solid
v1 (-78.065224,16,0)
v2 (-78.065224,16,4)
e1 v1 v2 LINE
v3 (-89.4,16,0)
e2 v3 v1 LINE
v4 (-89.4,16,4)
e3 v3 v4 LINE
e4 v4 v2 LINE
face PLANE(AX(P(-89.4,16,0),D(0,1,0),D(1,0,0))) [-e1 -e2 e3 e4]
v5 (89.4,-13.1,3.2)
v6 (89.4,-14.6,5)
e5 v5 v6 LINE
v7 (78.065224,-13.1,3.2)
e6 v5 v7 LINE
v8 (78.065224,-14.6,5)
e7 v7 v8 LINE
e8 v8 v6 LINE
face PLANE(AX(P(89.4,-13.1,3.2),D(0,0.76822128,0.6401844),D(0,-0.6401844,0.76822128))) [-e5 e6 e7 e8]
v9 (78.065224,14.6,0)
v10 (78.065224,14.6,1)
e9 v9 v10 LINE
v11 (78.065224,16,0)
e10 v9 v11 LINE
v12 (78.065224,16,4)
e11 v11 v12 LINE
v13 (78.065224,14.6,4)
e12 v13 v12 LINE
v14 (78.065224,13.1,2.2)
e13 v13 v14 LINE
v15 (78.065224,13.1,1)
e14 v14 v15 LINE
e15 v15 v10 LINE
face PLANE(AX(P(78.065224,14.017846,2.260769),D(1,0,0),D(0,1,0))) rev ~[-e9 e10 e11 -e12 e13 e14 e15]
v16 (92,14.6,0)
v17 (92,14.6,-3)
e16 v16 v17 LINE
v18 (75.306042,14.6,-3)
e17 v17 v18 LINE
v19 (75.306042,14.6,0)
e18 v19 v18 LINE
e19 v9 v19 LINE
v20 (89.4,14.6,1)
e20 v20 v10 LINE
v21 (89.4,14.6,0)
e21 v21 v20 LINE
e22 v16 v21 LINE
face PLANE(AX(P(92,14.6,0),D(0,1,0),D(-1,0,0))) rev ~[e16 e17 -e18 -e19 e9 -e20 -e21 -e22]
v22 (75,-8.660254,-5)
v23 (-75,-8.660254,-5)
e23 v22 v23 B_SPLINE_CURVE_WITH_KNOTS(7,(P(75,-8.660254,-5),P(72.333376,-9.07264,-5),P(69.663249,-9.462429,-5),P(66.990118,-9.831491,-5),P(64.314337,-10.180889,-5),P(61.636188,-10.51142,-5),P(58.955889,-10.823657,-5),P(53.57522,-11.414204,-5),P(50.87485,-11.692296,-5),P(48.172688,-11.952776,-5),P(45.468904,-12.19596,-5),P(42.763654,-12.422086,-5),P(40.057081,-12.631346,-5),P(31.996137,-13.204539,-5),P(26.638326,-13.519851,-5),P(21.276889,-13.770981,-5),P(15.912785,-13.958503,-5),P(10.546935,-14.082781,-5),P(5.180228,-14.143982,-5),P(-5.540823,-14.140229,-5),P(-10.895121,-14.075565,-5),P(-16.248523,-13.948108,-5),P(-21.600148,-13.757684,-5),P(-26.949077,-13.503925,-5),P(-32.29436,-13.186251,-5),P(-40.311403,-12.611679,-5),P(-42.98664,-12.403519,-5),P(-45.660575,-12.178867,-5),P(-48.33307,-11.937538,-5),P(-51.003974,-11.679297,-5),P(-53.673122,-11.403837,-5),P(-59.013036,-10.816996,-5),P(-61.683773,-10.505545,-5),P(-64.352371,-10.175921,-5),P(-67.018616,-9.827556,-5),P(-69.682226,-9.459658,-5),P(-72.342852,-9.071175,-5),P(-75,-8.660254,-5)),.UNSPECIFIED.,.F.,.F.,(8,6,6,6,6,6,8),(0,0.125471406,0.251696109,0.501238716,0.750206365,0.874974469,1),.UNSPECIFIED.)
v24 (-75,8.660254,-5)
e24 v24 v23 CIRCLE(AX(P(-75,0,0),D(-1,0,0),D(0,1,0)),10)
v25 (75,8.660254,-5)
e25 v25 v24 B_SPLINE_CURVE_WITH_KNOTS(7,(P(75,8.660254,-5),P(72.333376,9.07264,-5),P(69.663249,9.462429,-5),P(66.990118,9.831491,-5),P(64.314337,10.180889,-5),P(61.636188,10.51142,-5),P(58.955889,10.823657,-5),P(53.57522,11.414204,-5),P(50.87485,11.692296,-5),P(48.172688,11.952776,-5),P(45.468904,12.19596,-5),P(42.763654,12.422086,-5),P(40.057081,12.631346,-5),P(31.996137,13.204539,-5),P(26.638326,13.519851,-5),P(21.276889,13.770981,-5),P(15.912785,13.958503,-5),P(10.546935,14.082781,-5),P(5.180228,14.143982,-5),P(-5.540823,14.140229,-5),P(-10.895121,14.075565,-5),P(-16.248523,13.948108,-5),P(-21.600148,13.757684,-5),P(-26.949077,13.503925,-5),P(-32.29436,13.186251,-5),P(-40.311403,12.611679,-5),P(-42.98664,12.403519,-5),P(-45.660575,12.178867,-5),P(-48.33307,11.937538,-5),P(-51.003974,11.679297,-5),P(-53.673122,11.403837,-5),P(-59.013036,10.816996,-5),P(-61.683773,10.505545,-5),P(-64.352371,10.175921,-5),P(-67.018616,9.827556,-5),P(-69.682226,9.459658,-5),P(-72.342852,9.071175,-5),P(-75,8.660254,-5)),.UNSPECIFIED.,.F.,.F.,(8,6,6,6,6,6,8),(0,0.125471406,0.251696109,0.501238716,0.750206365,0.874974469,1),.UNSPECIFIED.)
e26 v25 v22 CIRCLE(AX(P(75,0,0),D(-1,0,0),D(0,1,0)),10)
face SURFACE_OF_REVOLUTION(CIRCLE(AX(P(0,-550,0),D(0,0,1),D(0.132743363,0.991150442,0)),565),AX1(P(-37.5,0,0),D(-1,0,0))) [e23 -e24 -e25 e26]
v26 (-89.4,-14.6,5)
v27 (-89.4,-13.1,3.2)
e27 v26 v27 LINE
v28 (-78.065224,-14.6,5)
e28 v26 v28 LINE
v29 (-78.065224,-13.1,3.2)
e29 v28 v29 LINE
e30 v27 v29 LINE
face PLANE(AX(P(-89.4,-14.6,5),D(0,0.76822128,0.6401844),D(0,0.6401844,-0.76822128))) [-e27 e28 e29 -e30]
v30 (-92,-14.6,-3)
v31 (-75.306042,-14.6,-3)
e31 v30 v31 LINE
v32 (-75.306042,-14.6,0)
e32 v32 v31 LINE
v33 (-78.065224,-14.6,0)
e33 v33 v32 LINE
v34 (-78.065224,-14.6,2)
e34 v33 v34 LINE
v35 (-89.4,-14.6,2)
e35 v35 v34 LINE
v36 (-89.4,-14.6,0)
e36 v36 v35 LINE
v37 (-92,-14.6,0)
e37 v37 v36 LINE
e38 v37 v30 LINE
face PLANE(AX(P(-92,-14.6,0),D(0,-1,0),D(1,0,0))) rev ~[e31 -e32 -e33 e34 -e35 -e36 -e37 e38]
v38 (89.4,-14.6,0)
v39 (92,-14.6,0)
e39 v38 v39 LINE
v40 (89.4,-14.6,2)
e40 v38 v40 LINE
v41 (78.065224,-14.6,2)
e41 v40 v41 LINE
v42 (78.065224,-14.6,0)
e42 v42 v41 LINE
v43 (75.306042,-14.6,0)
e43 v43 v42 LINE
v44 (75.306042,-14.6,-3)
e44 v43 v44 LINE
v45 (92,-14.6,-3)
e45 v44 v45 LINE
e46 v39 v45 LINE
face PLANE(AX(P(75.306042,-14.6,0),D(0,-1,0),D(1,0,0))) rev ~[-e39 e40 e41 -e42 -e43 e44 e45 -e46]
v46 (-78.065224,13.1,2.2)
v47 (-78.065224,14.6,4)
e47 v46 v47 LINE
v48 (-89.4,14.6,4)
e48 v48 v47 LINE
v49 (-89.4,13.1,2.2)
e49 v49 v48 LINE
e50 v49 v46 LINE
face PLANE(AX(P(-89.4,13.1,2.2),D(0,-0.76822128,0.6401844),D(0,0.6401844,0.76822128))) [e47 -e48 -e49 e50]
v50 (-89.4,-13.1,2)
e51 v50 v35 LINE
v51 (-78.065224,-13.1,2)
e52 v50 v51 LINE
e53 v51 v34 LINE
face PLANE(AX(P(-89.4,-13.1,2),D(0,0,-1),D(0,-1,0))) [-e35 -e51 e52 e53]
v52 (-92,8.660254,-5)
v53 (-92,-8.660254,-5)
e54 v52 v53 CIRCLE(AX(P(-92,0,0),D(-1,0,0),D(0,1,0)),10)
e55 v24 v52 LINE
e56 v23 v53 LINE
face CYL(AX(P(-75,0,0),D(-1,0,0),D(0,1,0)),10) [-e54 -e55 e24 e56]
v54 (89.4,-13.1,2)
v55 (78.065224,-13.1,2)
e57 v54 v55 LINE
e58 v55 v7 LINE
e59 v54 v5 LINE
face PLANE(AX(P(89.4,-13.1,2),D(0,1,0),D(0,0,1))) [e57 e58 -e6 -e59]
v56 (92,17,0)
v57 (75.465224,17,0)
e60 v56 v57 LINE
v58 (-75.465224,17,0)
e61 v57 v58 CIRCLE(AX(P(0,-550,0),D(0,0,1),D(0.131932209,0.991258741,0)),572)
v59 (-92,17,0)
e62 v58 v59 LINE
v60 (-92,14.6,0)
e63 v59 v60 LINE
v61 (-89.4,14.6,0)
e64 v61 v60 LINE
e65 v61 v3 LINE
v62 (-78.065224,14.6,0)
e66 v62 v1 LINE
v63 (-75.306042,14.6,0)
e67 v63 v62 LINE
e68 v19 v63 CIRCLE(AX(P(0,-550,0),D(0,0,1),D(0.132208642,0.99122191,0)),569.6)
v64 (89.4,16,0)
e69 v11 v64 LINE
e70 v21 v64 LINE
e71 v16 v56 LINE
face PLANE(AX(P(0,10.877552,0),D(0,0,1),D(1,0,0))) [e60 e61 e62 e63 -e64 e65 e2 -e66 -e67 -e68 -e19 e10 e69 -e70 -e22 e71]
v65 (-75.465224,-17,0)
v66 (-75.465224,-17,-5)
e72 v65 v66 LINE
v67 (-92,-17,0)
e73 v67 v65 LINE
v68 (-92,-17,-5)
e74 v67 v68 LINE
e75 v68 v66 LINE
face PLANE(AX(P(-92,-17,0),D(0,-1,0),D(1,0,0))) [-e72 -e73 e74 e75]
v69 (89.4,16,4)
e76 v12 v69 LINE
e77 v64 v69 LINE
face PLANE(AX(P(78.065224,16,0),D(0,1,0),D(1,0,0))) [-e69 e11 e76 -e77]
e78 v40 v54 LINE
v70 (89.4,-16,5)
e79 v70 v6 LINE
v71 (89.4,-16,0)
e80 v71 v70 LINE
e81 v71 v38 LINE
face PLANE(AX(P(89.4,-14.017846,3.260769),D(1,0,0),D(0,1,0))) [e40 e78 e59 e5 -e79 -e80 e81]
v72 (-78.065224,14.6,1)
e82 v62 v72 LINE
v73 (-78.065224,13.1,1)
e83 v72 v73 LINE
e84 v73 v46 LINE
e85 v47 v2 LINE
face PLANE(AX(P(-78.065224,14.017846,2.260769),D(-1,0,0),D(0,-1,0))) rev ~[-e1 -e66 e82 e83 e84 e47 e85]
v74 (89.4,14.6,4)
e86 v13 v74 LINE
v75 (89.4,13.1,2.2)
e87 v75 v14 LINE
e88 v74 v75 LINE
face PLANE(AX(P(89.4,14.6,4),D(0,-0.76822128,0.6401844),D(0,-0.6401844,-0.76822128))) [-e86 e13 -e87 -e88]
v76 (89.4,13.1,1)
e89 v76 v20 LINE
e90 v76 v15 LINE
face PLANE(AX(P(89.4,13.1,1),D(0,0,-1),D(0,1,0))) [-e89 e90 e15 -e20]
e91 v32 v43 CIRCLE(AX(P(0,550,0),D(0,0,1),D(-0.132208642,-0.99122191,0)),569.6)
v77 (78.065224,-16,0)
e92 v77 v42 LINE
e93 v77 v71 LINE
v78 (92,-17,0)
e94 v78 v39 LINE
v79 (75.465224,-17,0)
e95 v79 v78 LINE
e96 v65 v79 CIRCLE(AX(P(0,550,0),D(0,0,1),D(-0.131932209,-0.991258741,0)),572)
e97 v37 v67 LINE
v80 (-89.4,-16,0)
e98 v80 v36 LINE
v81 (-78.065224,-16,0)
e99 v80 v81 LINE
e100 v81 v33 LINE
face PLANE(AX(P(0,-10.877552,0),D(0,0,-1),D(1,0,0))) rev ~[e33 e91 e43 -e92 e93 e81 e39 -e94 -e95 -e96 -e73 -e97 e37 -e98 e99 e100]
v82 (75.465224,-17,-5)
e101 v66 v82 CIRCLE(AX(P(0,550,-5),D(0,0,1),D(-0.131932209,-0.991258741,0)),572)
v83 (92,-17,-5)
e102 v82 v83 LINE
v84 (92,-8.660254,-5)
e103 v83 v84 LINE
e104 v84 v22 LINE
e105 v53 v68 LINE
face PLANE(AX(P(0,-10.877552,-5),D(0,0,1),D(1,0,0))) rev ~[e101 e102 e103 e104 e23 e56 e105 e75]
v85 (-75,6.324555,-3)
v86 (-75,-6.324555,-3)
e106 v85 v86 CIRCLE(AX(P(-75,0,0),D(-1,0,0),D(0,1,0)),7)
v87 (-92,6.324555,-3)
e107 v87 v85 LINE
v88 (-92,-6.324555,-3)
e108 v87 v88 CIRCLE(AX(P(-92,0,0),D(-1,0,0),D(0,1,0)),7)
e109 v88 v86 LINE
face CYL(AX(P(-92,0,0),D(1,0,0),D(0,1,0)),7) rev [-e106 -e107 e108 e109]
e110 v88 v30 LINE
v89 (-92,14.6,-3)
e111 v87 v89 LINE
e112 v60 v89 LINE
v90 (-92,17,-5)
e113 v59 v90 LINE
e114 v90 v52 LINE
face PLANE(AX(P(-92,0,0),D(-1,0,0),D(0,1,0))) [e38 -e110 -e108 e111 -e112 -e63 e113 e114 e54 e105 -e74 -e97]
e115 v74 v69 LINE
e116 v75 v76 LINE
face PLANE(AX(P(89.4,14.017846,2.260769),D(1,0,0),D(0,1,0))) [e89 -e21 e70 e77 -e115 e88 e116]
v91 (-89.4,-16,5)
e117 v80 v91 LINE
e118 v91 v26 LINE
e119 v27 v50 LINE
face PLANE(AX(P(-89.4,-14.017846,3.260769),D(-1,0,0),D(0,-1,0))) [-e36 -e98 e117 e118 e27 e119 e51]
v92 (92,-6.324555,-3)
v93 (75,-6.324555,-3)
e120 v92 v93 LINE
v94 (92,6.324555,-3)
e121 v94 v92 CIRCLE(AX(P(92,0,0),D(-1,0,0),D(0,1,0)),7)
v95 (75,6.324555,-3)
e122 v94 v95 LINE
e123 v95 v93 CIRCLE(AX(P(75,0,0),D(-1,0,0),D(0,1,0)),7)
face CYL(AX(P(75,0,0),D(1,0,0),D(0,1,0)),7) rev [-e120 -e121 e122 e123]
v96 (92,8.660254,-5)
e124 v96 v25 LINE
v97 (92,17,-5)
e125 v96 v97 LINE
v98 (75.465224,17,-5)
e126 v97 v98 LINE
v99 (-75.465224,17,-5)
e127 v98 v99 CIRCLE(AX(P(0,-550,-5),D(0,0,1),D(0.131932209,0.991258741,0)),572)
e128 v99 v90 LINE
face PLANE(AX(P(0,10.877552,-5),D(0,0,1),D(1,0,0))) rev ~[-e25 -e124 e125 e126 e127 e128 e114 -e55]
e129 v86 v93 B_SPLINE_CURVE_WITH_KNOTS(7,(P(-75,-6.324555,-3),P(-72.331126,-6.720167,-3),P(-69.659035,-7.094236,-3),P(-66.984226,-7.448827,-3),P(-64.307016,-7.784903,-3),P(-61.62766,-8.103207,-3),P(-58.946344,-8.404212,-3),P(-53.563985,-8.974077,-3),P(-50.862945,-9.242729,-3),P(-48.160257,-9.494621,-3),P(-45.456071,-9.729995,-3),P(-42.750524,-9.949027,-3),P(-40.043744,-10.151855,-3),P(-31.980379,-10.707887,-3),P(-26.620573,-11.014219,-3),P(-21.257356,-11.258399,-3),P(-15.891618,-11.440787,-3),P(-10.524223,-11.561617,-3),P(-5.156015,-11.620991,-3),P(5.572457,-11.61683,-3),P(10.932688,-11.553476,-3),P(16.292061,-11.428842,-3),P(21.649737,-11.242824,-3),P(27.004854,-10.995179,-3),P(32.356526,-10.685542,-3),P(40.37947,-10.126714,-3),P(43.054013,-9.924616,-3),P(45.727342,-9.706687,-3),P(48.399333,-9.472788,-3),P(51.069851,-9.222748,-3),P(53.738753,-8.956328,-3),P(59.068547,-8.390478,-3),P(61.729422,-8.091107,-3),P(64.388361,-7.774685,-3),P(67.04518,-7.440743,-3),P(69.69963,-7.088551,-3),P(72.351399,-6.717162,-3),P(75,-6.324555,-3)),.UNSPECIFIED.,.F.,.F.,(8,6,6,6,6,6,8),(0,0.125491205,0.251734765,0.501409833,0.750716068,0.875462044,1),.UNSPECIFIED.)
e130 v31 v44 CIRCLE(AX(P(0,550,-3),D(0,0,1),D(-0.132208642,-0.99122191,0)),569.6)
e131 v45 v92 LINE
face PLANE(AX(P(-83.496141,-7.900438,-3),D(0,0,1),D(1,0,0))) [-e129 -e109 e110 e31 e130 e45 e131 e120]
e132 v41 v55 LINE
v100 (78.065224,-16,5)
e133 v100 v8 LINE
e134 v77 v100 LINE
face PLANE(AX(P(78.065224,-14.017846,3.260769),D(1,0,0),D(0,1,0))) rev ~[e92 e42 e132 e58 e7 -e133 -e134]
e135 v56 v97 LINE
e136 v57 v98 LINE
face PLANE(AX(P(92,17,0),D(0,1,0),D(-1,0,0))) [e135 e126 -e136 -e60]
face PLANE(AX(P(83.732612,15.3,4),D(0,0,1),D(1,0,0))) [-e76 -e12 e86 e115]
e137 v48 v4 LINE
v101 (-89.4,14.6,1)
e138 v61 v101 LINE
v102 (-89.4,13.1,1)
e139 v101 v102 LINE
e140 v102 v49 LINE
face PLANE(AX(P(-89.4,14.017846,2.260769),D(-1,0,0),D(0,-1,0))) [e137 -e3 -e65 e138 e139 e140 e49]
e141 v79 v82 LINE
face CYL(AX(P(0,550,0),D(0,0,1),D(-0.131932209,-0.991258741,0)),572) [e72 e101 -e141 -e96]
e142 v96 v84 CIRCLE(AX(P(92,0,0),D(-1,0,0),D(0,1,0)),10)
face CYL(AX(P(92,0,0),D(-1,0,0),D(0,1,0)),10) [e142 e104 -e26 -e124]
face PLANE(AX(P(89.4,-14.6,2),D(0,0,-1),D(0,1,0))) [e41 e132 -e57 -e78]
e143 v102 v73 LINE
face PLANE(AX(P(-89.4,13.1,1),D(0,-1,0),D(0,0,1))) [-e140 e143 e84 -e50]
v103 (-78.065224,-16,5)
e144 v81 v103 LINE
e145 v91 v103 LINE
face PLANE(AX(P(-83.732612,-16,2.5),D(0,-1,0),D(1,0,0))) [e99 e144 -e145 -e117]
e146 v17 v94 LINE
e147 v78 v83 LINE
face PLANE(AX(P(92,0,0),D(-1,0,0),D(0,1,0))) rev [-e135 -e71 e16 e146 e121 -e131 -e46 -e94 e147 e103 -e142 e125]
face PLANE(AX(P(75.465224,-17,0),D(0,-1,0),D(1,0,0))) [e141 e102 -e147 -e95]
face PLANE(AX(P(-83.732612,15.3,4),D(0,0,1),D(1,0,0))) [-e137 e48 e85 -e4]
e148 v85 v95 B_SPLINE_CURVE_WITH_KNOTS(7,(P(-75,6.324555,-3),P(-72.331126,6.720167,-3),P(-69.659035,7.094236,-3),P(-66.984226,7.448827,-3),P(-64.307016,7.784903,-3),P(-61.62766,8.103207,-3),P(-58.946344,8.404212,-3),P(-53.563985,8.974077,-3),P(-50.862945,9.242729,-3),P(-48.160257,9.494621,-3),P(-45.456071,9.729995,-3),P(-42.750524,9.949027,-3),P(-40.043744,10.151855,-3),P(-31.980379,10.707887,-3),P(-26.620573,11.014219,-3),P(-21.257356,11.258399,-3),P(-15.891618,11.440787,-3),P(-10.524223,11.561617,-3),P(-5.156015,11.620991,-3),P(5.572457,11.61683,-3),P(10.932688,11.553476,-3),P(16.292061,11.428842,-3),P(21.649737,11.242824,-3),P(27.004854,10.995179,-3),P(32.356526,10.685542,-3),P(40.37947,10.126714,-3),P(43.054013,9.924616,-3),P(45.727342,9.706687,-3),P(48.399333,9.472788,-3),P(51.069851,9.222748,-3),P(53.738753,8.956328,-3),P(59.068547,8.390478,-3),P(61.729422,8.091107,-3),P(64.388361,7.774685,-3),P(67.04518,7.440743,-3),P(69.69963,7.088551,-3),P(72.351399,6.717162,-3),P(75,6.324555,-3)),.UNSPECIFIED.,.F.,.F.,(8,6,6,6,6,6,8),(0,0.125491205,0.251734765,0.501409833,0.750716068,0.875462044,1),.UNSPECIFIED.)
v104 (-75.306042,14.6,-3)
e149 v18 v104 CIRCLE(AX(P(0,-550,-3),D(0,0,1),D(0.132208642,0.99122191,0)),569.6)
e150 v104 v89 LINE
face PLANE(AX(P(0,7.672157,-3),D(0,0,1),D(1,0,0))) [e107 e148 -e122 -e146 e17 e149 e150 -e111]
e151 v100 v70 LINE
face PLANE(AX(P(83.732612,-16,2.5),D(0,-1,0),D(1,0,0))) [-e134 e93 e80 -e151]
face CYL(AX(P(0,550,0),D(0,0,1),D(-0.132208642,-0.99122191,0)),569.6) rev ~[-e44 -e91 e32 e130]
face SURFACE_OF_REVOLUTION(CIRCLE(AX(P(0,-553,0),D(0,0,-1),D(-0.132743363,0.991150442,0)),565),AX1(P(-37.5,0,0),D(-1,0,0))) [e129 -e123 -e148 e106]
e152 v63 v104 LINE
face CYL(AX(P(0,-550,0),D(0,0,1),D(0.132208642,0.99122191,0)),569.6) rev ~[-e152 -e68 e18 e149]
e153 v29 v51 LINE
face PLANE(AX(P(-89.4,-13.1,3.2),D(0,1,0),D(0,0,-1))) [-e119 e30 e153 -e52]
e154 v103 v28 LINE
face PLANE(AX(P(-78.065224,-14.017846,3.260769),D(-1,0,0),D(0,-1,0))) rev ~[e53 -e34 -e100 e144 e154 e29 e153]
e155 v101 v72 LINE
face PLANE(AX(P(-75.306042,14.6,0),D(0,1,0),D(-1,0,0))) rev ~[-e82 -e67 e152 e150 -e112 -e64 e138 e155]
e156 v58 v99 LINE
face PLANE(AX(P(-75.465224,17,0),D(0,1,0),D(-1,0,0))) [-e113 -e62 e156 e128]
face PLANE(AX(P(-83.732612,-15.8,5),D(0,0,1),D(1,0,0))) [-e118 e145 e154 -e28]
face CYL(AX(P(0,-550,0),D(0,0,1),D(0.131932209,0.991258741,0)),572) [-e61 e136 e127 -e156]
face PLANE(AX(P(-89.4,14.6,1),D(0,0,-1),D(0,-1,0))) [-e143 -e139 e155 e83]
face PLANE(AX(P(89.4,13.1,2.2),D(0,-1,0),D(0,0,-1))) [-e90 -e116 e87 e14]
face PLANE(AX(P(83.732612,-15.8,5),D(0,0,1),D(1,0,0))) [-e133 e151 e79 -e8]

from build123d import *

# Parameters (mm, degrees)
F1_ANGLE  = 180
F3_DEPTH  = 5
F5_DEPTH  = 5
F7_DEPTH  = 3
F9_DEPTH  = 17
F11_DEPTH = 17
F13_DEPTH = 3
F15_DEPTH = 17
F17_DEPTH = 17
F19_DEPTH = 3
F21_DEPTH = 3
F22_W     = 11.3347762211
F22_H     = 1.4
F23_DEPTH = 4
F24_W     = 11.3347762211
F24_H     = 2.4
F25_DEPTH = 5
F27_DEPTH = 11.3347762211
F28_W     = 11.3347762211
F28_H     = 5
F29_DEPTH = 1
F31_DEPTH = 11.3347762211
F32_W     = 11.3347762211
F32_H     = 5
F33_DEPTH = 1
F35_DEPTH = 11.3347762211
F37_DEPTH = 11.3347762211


with BuildPart() as f1:
    # F0 (on Top) → F1 (revolve)
    with BuildSketch(Plane.XY):
        with BuildLine():
            ThreePointArc((-75, 7), (0, 12), (75, 7))
            Line((75, 7), (92, 7))
            Line((92, 7), (92, 10))
            Line((92, 10), (75, 10))
            ThreePointArc((75, 10), (0, 15), (-75, 10))
            Line((-75, 10), (-92, 10))
            Line((-92, 10), (-92, 7))
            Line((-92, 7), (-75, 7))
        make_face()
    revolve(axis=Axis((-37.5, 0, 0), (-1, 0, 0)), revolution_arc=F1_ANGLE)

    # F2 (on face) → F3 (join)
    with BuildSketch(Plane.XY):
        with BuildLine():
            Line((-75, 10), (-92, 10))
            Line((-92, 10), (-92, 7))
            Line((-92, 7), (-75, 7))
            ThreePointArc((-75, 7), (0, 12), (75, 7))
            Line((75, 7), (92, 7))
            Line((92, 7), (92, 10))
            Line((92, 10), (75, 10))
            ThreePointArc((75, 10), (0, 15), (-75, 10))
        make_face()
        with BuildLine():
            Line((-75.4652237789, 17), (-92, 17))
            Line((-92, 17), (-92, 10))
            Line((-92, 10), (-75, 10))
            ThreePointArc((-75, 10), (0, 15), (75, 10))
            Line((75, 10), (92, 10))
            Line((92, 10), (92, 17))
            Line((92, 17), (75.4652237789, 17))
            ThreePointArc((75.4652237789, 17), (0, 22), (-75.4652237789, 17))
        make_face()
    extrude(amount=-F3_DEPTH)

    # F4 (on face) → F5 (join)
    with BuildSketch(Plane.XY):
        with BuildLine():
            Line((-92, -7), (-92, -10))
            Line((-92, -10), (-75, -10))
            ThreePointArc((-75, -10), (0, -15), (75, -10))
            Line((75, -10), (92, -10))
            Line((92, -10), (92, -7))
            Line((92, -7), (75, -7))
            ThreePointArc((75, -7), (0, -12), (-75, -7))
            Line((-75, -7), (-92, -7))
        make_face()
        with BuildLine():
            Line((-92, -10), (-92, -17))
            Line((-92, -17), (-75.4652237789, -17))
            ThreePointArc((-75.4652237789, -17), (0, -22), (75.4652237789, -17))
            Line((75.4652237789, -17), (92, -17))
            Line((92, -17), (92, -10))
            Line((92, -10), (75, -10))
            ThreePointArc((75, -10), (0, -15), (-75, -10))
            Line((-75, -10), (-92, -10))
        make_face()
    extrude(amount=-F5_DEPTH)

    # F6 (on face) → F7 (cut)
    with BuildSketch(Plane.XY):
        with BuildLine():
            Line((-75.3060422543, 14.6), (-92, 14.6))
            Line((-92, 14.6), (-92, 7))
            Line((-92, 7), (-75, 7))
            Line((-75, 7), (-75, 8.8160197075))
            ThreePointArc((-75, 8.8160197075), (0, 13.8), (75, 8.8160197075))
            Line((75, 8.8160197075), (75, 7))
            Line((75, 7), (92, 7))
            Line((92, 7), (92, 14.6))
            Line((92, 14.6), (75.3060422543, 14.6))
            ThreePointArc((75.3060422543, 14.6), (0, 19.6), (-75.3060422543, 14.6))
        make_face()
        with BuildLine():
            Line((-75, 8.8160197075), (-75, 7))
            ThreePointArc((-75, 7), (0, 12), (75, 7))
            Line((75, 7), (75, 8.8160197075))
            ThreePointArc((75, 8.8160197075), (0, 13.8), (-75, 8.8160197075))
        make_face()
    extrude(amount=-F7_DEPTH, mode=Mode.SUBTRACT)

    # F8 (on face) → F9 (cut)
    with BuildSketch(Plane(origin=(-92, 0, 0), x_dir=(0, -1, 0), z_dir=(-1, 0, 0))):
        with BuildLine():
            Line((-7, 0), (-7, -3))
            Line((-7, -3), (-6.3245553203, -3))
            ThreePointArc((-6.3245553203, -3), (-6.8290514437, -1.5375488216), (-7, 0))
        make_face()
    extrude(amount=-F9_DEPTH, mode=Mode.SUBTRACT)

    # F10 (on face) → F11 (cut)
    with BuildSketch(Plane.YZ.offset(92)):
        with BuildLine():
            Line((6.3245553203, -3), (7, -3))
            Line((7, -3), (7, 0))
            ThreePointArc((7, 0), (6.8290514437, -1.5375488216), (6.3245553203, -3))
        make_face()
    extrude(amount=-F11_DEPTH, mode=Mode.SUBTRACT)

    # F12 (on face) → F13 (cut)
    with BuildSketch(Plane.XY):
        with BuildLine():
            Line((-92, -7), (-92, -8.8))
            Line((-92, -8.8), (-75.1199041533, -8.8))
            ThreePointArc((-75.1199041533, -8.8), (-75.059952504, -8.8080130526), (-75, -8.8160197075))
            Line((-75, -8.8160197075), (-75, -7))
            Line((-75, -7), (-92, -7))
        make_face()
        with BuildLine():
            Line((-92, -8.8), (-92, -14.6))
            Line((-92, -14.6), (-75.3060422543, -14.6))
            ThreePointArc((-75.3060422543, -14.6), (0, -19.6), (75.3060422543, -14.6))
            Line((75.3060422543, -14.6), (92, -14.6))
            Line((92, -14.6), (92, -8.8))
            Line((92, -8.8), (75.1199041533, -8.8))
            ThreePointArc((75.1199041533, -8.8), (75.059952504, -8.8080130526), (75, -8.8160197075))
            ThreePointArc((75, -8.8160197075), (0, -13.8), (-75, -8.8160197075))
            ThreePointArc((-75, -8.8160197075), (-75.059952504, -8.8080130526), (-75.1199041533, -8.8))
            Line((-75.1199041533, -8.8), (-92, -8.8))
        make_face()
        with BuildLine():
            Line((75.1199041533, -8.8), (92, -8.8))
            Line((92, -8.8), (92, -7))
            Line((92, -7), (75, -7))
            Line((75, -7), (75, -8.8160197075))
            ThreePointArc((75, -8.8160197075), (75.059952504, -8.8080130526), (75.1199041533, -8.8))
        make_face()
    extrude(amount=-F13_DEPTH, mode=Mode.SUBTRACT)

    # F14 (on face) → F15 (cut)
    with BuildSketch(Plane(origin=(-92, 0, 0), x_dir=(0, -1, 0), z_dir=(-1, 0, 0))):
        with BuildLine():
            Line((6.3245553203, -3), (7, -3))
            Line((7, -3), (7, 0))
            ThreePointArc((7, 0), (6.8290514437, -1.5375488216), (6.3245553203, -3))
        make_face()
    extrude(amount=-F15_DEPTH, mode=Mode.SUBTRACT)

    # F16 (on face) → F17 (cut)
    with BuildSketch(Plane.YZ.offset(92)):
        with BuildLine():
            Line((-7, 0), (-7, -3))
            Line((-7, -3), (-6.3245553203, -3))
            ThreePointArc((-6.3245553203, -3), (-6.8290514437, -1.5375488216), (-7, 0))
        make_face()
    extrude(amount=-F17_DEPTH, mode=Mode.SUBTRACT)

    # F18 (on face) → F19 (cut)
    with BuildSketch(Plane.XY):
        with BuildLine():
            ThreePointArc((75, 7), (0, 12), (-75, 7))
            Line((-75, 7), (-75, 5.4070060141))
            Line((-75, 5.4070060141), (75, 5.4070060141))
            Line((75, 5.4070060141), (75, 7))
        make_face()
    extrude(amount=-F19_DEPTH, mode=Mode.SUBTRACT)

    # F20 (on face) → F21 (cut)
    with BuildSketch(Plane.XY):
        with BuildLine():
            Line((-75, -5.2931243554), (-75, -7))
            ThreePointArc((-75, -7), (0, -12), (75, -7))
            Line((75, -7), (75, -5.2931243554))
            Line((75, -5.2931243554), (-75, -5.2931243554))
        make_face()
        with BuildLine():
            Line((-75, -7), (-75, -8.8160197075))
            ThreePointArc((-75, -8.8160197075), (0, -13.8), (75, -8.8160197075))
            Line((75, -8.8160197075), (75, -7))
            ThreePointArc((75, -7), (0, -12), (-75, -7))
        make_face()
    extrude(amount=-F21_DEPTH, mode=Mode.SUBTRACT)

    # F22 (on face) → F23 (join)
    with BuildSketch(Plane.XY):
        with Locations((83.7326118895, 15.3)):
            Rectangle(F22_W, F22_H)
        with Locations((-83.7326118895, 15.3)):
            Rectangle(F22_W, F22_H)
    extrude(amount=F23_DEPTH)

    # F24 (on face) → F25 (join)
    with BuildSketch(Plane.XY):
        with Locations((83.7326118895, -15.8)):
            Rectangle(F24_W, F24_H)
        with Locations((-83.7326118895, -15.8)):
            Rectangle(F24_W, F24_H)
    extrude(amount=F25_DEPTH)

    # F26 (on face) → F27 (join, through all)
    with BuildSketch(Plane(origin=(-89.4, 0, 0), x_dir=(0, -1, 0), z_dir=(-1, 0, 0))):
        Polygon((13.1, 3.2), (13.1, 2), (14.6, 2), (14.6, 5), align=None)
    extrude(amount=-F27_DEPTH)

    # F28 (on face) → F29 (cut)
    with BuildSketch(Plane.XZ.offset(17)):
        with Locations((-83.7326118895, 2.5)):
            Rectangle(F28_W, F28_H)
    extrude(amount=-F29_DEPTH, mode=Mode.SUBTRACT)

    # F30 (on face) → F31 (join, through all)
    with BuildSketch(Plane.YZ.offset(89.4)):
        Polygon((-14.6, 5), (-14.6, 2), (-13.1, 2), (-13.1, 3.2), align=None)
    extrude(amount=-F31_DEPTH)

    # F32 (on face) → F33 (cut)
    with BuildSketch(Plane.XZ.offset(17)):
        with Locations((83.7326118895, 2.5)):
            Rectangle(F32_W, F32_H)
    extrude(amount=-F33_DEPTH, mode=Mode.SUBTRACT)

    # F34 (on face) → F35 (join, through all)
    with BuildSketch(Plane.YZ.offset(89.4)):
        Polygon((13.1, 1), (14.6, 1), (14.6, 4), (13.1, 2.2), align=None)
    extrude(amount=-F35_DEPTH)

    # F36 (on face) → F37 (join, through all)
    with BuildSketch(Plane(origin=(-89.4, 0, 0), x_dir=(0, -1, 0), z_dir=(-1, 0, 0))):
        Polygon((-14.6, 4), (-14.6, 1), (-13.1, 1), (-13.1, 2.2), align=None)
    extrude(amount=-F37_DEPTH)


solid = f1.part
